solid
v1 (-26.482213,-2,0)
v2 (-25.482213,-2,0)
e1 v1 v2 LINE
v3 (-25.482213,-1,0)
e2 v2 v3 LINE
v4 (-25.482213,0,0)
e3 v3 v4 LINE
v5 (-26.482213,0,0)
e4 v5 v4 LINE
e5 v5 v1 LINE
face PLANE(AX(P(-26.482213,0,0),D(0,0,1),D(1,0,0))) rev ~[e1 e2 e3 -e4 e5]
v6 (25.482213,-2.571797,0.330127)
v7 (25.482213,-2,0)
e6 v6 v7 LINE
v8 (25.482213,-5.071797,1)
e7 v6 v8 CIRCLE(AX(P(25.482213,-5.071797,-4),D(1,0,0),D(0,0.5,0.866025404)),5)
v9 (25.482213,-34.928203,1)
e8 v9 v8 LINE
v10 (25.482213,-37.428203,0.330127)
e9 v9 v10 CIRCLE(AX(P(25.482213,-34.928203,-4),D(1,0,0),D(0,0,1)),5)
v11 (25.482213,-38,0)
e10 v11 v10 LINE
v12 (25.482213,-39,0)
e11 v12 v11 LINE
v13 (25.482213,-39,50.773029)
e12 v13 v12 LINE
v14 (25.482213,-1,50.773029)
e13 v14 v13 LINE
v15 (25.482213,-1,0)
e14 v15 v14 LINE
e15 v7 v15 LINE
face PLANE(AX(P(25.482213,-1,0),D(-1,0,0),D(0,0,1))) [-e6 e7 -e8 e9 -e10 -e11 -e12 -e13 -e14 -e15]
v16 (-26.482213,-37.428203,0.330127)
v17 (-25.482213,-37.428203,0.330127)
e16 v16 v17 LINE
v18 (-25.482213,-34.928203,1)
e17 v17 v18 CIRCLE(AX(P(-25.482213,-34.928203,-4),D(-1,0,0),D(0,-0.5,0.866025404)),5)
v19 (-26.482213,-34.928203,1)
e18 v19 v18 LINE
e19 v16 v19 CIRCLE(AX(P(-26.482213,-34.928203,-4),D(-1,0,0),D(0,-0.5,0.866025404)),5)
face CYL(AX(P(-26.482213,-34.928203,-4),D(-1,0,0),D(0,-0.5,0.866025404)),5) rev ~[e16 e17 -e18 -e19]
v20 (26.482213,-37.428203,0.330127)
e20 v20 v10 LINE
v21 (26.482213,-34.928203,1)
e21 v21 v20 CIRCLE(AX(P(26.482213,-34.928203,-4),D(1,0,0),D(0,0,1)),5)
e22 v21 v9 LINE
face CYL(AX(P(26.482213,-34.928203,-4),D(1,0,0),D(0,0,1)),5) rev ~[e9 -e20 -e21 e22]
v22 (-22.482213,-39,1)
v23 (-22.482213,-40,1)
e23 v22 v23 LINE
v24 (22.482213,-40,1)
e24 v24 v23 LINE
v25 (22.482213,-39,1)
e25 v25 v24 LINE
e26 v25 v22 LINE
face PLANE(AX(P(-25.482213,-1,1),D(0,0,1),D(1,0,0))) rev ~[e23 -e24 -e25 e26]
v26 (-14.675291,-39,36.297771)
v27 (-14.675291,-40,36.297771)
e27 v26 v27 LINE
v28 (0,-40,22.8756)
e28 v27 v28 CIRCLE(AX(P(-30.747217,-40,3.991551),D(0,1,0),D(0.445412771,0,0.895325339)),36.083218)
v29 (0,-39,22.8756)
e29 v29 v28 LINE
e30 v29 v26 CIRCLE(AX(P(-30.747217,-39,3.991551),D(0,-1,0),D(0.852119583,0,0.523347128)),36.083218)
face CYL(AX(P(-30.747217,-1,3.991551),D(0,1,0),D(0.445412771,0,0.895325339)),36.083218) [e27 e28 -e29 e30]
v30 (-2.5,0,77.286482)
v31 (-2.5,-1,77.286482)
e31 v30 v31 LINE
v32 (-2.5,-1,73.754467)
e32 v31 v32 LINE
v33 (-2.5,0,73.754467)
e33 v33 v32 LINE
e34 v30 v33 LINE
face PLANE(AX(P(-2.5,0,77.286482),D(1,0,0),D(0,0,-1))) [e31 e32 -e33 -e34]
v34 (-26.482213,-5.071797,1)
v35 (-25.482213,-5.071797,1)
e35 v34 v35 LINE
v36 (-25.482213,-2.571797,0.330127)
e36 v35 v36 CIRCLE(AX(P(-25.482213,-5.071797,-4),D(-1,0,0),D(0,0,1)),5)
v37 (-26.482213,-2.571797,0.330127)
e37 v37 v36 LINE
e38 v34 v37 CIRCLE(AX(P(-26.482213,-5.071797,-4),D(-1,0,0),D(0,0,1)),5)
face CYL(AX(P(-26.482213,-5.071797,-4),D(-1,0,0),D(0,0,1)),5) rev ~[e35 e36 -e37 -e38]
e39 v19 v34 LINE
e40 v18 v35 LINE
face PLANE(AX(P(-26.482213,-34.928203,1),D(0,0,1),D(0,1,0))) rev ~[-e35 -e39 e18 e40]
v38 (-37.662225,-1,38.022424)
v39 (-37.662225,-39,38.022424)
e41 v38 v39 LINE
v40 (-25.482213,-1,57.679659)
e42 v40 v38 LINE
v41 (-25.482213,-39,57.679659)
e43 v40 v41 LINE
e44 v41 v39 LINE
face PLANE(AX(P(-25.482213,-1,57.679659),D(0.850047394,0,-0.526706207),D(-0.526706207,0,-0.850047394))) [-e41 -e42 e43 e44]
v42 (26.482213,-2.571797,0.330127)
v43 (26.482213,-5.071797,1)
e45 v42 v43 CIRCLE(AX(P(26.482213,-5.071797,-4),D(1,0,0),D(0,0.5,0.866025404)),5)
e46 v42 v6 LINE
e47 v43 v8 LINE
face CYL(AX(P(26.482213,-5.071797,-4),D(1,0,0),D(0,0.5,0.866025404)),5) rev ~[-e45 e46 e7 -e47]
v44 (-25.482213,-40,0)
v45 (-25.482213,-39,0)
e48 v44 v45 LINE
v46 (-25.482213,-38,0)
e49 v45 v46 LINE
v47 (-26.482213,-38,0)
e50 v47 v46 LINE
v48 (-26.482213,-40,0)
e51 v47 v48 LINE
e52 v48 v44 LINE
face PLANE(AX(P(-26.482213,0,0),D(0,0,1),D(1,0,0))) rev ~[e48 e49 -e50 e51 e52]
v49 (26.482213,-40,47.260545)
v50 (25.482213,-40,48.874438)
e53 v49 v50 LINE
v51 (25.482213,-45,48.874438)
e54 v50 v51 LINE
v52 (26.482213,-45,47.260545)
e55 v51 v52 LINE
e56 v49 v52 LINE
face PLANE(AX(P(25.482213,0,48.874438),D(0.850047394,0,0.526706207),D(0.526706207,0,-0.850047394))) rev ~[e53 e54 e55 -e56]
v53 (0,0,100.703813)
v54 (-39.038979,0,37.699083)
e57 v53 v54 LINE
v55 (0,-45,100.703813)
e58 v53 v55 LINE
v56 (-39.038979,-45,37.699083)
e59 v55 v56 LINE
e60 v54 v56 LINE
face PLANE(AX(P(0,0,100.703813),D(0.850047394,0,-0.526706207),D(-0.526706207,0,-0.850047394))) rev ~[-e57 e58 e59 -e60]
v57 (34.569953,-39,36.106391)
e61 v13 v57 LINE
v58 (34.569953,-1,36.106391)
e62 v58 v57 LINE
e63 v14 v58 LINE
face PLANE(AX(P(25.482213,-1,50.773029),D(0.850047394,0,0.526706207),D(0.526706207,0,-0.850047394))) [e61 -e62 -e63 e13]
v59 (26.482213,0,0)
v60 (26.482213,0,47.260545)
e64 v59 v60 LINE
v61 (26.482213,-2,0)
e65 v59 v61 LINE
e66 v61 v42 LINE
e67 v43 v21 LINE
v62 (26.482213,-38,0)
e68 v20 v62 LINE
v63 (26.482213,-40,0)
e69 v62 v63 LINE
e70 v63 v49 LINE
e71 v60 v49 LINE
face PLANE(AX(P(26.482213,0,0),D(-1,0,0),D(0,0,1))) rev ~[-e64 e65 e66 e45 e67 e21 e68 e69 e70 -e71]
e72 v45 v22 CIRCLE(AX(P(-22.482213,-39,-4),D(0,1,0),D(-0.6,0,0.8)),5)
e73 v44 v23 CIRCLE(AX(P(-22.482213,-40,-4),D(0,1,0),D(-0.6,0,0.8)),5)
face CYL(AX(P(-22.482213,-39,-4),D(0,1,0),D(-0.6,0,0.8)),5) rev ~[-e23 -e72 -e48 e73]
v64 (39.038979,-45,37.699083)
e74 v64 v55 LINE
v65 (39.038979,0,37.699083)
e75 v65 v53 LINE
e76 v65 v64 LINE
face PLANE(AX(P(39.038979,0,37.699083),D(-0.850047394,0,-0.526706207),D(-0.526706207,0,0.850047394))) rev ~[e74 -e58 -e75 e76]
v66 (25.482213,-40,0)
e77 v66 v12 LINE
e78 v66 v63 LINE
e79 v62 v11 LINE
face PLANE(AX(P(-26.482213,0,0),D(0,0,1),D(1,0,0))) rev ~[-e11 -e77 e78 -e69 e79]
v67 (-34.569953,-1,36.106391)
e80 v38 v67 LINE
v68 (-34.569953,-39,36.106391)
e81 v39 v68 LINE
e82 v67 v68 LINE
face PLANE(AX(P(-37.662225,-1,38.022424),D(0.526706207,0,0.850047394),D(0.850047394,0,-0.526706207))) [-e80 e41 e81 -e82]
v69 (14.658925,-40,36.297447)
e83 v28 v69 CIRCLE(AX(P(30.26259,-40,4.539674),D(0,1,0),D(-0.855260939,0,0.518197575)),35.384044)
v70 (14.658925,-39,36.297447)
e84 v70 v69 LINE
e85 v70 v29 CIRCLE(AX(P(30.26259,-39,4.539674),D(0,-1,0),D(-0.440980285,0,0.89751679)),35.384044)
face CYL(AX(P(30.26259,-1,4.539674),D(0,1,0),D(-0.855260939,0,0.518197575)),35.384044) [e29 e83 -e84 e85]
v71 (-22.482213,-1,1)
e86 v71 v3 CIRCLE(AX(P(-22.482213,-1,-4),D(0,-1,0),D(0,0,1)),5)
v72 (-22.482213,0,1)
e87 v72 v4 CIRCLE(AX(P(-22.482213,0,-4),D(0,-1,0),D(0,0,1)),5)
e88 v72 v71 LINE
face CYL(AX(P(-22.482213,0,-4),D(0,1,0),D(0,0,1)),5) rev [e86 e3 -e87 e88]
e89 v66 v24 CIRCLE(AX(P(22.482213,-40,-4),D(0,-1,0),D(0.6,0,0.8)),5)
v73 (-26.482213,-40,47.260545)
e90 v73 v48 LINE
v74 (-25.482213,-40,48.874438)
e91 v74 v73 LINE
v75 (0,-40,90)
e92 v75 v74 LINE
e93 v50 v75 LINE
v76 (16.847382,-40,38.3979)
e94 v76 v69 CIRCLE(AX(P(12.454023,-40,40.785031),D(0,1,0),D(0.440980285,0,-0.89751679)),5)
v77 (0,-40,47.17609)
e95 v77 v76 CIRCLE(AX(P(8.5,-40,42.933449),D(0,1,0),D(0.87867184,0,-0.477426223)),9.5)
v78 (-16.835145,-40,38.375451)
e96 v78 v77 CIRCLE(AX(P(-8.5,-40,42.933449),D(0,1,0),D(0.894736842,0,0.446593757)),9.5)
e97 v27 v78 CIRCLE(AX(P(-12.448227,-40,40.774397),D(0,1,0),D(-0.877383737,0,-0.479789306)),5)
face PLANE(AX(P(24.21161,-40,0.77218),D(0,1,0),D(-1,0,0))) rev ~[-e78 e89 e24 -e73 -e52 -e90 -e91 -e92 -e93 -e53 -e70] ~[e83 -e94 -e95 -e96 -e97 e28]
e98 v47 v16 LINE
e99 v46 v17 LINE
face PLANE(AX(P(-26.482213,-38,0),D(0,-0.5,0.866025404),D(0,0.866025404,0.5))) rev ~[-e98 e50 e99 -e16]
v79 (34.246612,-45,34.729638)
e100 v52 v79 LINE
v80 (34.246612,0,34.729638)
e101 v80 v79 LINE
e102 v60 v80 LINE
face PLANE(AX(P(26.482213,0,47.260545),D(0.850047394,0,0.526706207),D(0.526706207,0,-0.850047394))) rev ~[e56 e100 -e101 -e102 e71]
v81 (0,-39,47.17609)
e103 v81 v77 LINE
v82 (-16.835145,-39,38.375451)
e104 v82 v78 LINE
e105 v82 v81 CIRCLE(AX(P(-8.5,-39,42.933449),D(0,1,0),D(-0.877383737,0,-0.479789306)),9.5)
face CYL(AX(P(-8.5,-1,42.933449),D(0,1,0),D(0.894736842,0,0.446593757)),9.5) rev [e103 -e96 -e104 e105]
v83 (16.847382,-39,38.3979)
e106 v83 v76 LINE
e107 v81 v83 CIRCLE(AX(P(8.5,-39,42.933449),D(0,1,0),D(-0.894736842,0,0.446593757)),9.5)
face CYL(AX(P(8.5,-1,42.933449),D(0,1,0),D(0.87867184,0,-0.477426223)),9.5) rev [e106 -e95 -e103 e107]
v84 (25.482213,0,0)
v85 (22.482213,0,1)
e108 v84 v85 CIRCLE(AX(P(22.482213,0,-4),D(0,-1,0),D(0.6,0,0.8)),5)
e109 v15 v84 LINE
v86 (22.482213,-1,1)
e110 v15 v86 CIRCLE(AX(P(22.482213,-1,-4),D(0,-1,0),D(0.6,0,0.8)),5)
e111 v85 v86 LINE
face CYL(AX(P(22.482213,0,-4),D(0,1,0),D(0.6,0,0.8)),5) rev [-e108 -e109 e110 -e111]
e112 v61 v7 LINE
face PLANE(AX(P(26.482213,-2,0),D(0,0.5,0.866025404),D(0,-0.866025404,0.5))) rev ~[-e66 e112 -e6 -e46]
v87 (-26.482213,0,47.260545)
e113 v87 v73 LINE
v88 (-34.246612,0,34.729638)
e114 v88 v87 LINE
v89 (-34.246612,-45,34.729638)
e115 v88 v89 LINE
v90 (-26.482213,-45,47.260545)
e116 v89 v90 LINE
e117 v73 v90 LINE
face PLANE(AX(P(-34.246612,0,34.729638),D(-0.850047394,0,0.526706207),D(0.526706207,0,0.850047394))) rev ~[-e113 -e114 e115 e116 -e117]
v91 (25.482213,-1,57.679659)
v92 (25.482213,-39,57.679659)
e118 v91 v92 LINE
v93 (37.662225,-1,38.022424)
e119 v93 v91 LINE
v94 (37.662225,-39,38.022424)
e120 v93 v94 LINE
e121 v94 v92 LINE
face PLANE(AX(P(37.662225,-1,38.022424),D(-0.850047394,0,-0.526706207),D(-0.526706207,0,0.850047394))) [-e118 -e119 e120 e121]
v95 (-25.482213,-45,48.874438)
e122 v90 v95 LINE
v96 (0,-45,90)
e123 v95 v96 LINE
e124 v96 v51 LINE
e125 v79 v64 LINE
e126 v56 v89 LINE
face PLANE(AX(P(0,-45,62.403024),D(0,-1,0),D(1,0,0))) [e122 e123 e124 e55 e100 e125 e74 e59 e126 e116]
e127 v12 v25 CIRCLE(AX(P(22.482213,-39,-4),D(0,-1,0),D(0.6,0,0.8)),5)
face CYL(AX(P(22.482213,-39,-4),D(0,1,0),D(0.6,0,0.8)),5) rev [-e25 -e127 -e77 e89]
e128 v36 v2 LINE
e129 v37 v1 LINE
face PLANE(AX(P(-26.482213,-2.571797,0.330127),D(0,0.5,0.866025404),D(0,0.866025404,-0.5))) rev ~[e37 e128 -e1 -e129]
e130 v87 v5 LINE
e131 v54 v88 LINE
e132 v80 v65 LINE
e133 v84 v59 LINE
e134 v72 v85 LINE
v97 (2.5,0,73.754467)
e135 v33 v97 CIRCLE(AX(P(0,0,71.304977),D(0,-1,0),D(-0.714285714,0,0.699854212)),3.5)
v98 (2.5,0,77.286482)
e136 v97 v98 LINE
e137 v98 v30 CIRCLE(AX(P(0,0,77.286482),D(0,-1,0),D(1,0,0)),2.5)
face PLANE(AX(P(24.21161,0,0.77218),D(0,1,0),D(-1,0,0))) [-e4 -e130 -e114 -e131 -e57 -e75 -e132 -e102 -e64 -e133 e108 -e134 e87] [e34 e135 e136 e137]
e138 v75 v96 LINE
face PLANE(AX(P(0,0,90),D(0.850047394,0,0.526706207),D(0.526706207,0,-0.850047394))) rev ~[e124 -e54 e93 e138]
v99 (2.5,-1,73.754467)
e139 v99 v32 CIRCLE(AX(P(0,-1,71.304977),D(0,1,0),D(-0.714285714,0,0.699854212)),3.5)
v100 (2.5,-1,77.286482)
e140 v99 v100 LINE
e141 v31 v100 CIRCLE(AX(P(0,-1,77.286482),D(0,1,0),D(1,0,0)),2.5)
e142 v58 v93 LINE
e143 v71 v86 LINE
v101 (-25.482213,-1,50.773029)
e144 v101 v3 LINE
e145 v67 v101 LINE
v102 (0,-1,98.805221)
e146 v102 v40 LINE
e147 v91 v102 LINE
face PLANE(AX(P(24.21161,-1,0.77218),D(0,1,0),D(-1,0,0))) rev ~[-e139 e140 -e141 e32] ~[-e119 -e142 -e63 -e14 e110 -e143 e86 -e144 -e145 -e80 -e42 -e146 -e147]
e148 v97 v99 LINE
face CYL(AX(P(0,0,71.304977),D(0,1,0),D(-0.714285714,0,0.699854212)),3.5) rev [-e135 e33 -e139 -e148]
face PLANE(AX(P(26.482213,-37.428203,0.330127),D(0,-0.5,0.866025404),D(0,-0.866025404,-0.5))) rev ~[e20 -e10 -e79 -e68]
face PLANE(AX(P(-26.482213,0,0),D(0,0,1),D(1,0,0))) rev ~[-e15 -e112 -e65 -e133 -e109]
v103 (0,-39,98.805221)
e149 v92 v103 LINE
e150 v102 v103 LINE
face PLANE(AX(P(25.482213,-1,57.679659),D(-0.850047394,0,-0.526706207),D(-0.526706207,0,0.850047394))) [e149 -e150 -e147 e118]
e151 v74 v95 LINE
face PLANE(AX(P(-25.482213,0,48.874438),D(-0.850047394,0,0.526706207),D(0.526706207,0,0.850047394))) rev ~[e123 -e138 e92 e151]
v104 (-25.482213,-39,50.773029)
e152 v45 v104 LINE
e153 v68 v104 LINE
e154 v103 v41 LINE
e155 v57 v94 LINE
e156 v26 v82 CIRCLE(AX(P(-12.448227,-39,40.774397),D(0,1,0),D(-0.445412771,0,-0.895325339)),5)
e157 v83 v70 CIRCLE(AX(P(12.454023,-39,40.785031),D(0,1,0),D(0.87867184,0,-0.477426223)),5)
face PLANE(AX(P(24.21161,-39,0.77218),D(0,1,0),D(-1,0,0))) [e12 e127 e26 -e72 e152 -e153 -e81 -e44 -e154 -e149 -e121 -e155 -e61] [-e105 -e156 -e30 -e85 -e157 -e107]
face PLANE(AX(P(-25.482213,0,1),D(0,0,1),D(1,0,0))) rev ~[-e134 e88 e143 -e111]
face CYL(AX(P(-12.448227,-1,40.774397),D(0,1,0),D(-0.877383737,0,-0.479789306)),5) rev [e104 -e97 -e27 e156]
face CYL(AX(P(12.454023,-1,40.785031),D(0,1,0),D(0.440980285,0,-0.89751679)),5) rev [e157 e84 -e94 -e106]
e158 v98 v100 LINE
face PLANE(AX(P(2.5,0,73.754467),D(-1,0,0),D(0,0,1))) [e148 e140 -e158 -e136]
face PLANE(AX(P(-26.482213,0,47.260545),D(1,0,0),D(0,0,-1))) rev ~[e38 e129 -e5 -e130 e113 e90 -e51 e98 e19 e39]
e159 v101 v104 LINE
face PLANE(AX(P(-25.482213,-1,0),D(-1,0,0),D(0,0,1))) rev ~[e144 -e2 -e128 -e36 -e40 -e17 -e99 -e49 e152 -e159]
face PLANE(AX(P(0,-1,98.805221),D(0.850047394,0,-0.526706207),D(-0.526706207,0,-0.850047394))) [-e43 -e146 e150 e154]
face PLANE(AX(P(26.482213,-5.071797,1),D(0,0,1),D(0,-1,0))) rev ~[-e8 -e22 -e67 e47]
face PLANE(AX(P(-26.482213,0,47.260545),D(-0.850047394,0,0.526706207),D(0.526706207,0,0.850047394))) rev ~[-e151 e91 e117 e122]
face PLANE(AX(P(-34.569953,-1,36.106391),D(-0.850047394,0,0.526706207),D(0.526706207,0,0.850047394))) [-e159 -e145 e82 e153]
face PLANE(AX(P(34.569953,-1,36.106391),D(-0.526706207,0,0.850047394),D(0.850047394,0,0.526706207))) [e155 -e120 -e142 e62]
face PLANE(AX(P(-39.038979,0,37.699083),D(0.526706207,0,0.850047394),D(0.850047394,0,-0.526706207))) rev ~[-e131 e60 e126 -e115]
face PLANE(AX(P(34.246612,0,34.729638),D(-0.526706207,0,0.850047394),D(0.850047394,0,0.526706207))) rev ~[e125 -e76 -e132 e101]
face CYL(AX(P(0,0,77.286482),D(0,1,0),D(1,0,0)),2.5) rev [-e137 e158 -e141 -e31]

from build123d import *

# Parameters (mm, degrees)
F0_W         = 50.964426635
F0_H         = 1
F1_DEPTH     = 40
F2_DEPTH     = 45
F3_DEPTH     = 5
F4_START     = 1
F4_DEPTH     = 44.001
F6_START     = 1
F6_DEPTH     = 38
F7_START     = 1
F7_DEPTH     = 44.001
F9_DEPTH     = 25
F11_DEPTH    = 25
F12_T1_DEPTH = 1
F12_T3_DEPTH = 1


# Not quite as in the source:
# - a fillet or chamfer that OpenCascade refuses, or shapes differently, is made with other operations: its cross-section is extruded or revolved along the edge and cut away or added


with BuildPart() as f1:
    # F0 (on Front) → F1 (new body)
    with BuildSketch(Plane.XZ):
        Polygon((25.4822133175, 48.8744375096), (0, 90), (-25.4822133175, 48.8744375096), (-25.4822133175, 1), (25.4822133175, 1), align=None)
        with BuildLine():
            ThreePointArc((-16.8351454988, 38.3754507383), (-12.9010914993, 51.3524985976), (0, 47.1760898363))
            ThreePointArc((0, 47.1760898363), (12.8897582031, 51.3584134172), (16.847382477, 38.3979000332))
            ThreePointArc((16.847382477, 38.3979000332), (15.916282128, 37.1777103045), (14.6589247027, 36.2974471967))
            ThreePointArc((14.6589247027, 36.2974471967), (6.3677193864, 30.6369091459), (0, 22.8755995631))
            ThreePointArc((0, 22.8755995631), (-6.3946665322, 30.6177021843), (-14.6752906719, 36.297770574))
            ThreePointArc((-14.6752906719, 36.297770574), (-15.914547628, 37.1709794451), (-16.8351454988, 38.3754507383))
        make_face(mode=Mode.SUBTRACT)
        with BuildLine():
            Line((-2.5, 73.7544666829), (-2.5, 77.2864818573))
            ThreePointArc((-2.5, 77.2864818573), (0, 79.7864818573), (2.5, 77.2864818573))
            Line((2.5, 77.2864818573), (2.5, 73.7544666829))
            ThreePointArc((2.5, 73.7544666829), (0, 67.8049769402), (-2.5, 73.7544666829))
        make_face(mode=Mode.SUBTRACT)
        with BuildLine():
            ThreePointArc((16.847382477, 38.3979000332), (12.8897582031, 51.3584134172), (0, 47.1760898363))
            ThreePointArc((0, 47.1760898363), (-12.9010914993, 51.3524985976), (-16.8351454988, 38.3754507383))
            ThreePointArc((-16.8351454988, 38.3754507383), (-15.914547628, 37.1709794451), (-14.6752906719, 36.297770574))
            ThreePointArc((-14.6752906719, 36.297770574), (-6.3946665322, 30.6177021843), (0, 22.8755995631))
            ThreePointArc((0, 22.8755995631), (6.3677193864, 30.6369091459), (14.6589247027, 36.2974471967))
            ThreePointArc((14.6589247027, 36.2974471967), (15.916282128, 37.1777103045), (16.847382477, 38.3979000332))
        make_face()
        with BuildLine():
            ThreePointArc((2.5, 77.2864818573), (0, 79.7864818573), (-2.5, 77.2864818573))
            Line((-2.5, 77.2864818573), (-2.5, 73.7544666829))
            ThreePointArc((-2.5, 73.7544666829), (0, 67.8049769402), (2.5, 73.7544666829))
            Line((2.5, 73.7544666829), (2.5, 77.2864818573))
        make_face()
        with Locations((0, 0.5)):
            Rectangle(F0_W, F0_H)
        Polygon((-25.4822133175, 1), (-25.4822133175, 48.8744375096), (-26.4822133175, 47.2605446354), (-26.4822133175, 0), (-25.4822133175, 0), align=None)
        Polygon((26.4822133175, 47.2605446354), (25.4822133175, 48.8744375096), (25.4822133175, 1), (25.4822133175, 0), (26.4822133175, 0), align=None)
    extrude(amount=F1_DEPTH)

    # F0 (on Front) → F2 (join)
    with BuildSketch(Plane.XZ):
        Polygon((-26.4822133175, 47.2605446354), (-25.4822133175, 48.8744375096), (-25.4822133175, 50.7730291479), (-34.5699527606, 36.1063912187), (-37.6622251316, 38.0224244453), (-25.4822133175, 57.679658719), (0, 98.8052212095), (25.4822133175, 57.679658719), (37.6622251316, 38.0224244453), (34.5699527606, 36.1063912187), (25.4822133175, 50.7730291479), (25.4822133175, 48.8744375096), (26.4822133175, 47.2605446354), (34.2466115735, 34.7296376181), (39.0389787322, 37.6990832582), (0, 100.7038128478), (-39.0389787322, 37.6990832582), (-34.2466115735, 34.7296376181), align=None)
        Polygon((-25.4822133175, 48.8744375096), (0, 90), (25.4822133175, 48.8744375096), (25.4822133175, 50.7730291479), (25.4822133175, 57.679658719), (0, 98.8052212095), (-25.4822133175, 57.679658719), (-25.4822133175, 50.7730291479), align=None)
        Polygon((-34.5699527606, 36.1063912187), (-25.4822133175, 50.7730291479), (-25.4822133175, 57.679658719), (-37.6622251316, 38.0224244453), align=None)
        Polygon((25.4822133175, 57.679658719), (25.4822133175, 50.7730291479), (34.5699527606, 36.1063912187), (37.6622251316, 38.0224244453), align=None)
    extrude(amount=F2_DEPTH)

    # F0 (on Front) → F3 (cut)
    with BuildSketch(Plane.XZ):
        with BuildLine():
            ThreePointArc((2.5, 77.2864818573), (0, 79.7864818573), (-2.5, 77.2864818573))
            Line((-2.5, 77.2864818573), (-2.5, 73.7544666829))
            ThreePointArc((-2.5, 73.7544666829), (0, 67.8049769402), (2.5, 73.7544666829))
            Line((2.5, 73.7544666829), (2.5, 77.2864818573))
        make_face()
        with Locations((0, 0.5)):
            Rectangle(F0_W, F0_H)
    extrude(amount=F3_DEPTH, mode=Mode.SUBTRACT)

    # F0 (on Front) → F4 (cut)
    with BuildSketch(Plane.XZ.offset(F4_START)):
        with BuildLine():
            ThreePointArc((16.847382477, 38.3979000332), (12.8897582031, 51.3584134172), (0, 47.1760898363))
            ThreePointArc((0, 47.1760898363), (-12.9010914993, 51.3524985976), (-16.8351454988, 38.3754507383))
            ThreePointArc((-16.8351454988, 38.3754507383), (-15.914547628, 37.1709794451), (-14.6752906719, 36.297770574))
            ThreePointArc((-14.6752906719, 36.297770574), (-6.3946665322, 30.6177021843), (0, 22.8755995631))
            ThreePointArc((0, 22.8755995631), (6.3677193864, 30.6369091459), (14.6589247027, 36.2974471967))
            ThreePointArc((14.6589247027, 36.2974471967), (15.916282128, 37.1777103045), (16.847382477, 38.3979000332))
        make_face()
    extrude(amount=F4_DEPTH, mode=Mode.SUBTRACT)

    # F0 (on Front) → F6 (cut)
    with BuildSketch(Plane.XZ.offset(F6_START)):
        Polygon((25.4822133175, 48.8744375096), (0, 90), (-25.4822133175, 48.8744375096), (-25.4822133175, 1), (25.4822133175, 1), align=None)
        with BuildLine():
            ThreePointArc((-16.8351454988, 38.3754507383), (-12.9010914993, 51.3524985976), (0, 47.1760898363))
            ThreePointArc((0, 47.1760898363), (12.8897582031, 51.3584134172), (16.847382477, 38.3979000332))
            ThreePointArc((16.847382477, 38.3979000332), (15.916282128, 37.1777103045), (14.6589247027, 36.2974471967))
            ThreePointArc((14.6589247027, 36.2974471967), (6.3677193864, 30.6369091459), (0, 22.8755995631))
            ThreePointArc((0, 22.8755995631), (-6.3946665322, 30.6177021843), (-14.6752906719, 36.297770574))
            ThreePointArc((-14.6752906719, 36.297770574), (-15.914547628, 37.1709794451), (-16.8351454988, 38.3754507383))
        make_face(mode=Mode.SUBTRACT)
        with BuildLine():
            Line((-2.5, 73.7544666829), (-2.5, 77.2864818573))
            ThreePointArc((-2.5, 77.2864818573), (0, 79.7864818573), (2.5, 77.2864818573))
            Line((2.5, 77.2864818573), (2.5, 73.7544666829))
            ThreePointArc((2.5, 73.7544666829), (0, 67.8049769402), (-2.5, 73.7544666829))
        make_face(mode=Mode.SUBTRACT)
        Polygon((-25.4822133175, 48.8744375096), (0, 90), (25.4822133175, 48.8744375096), (25.4822133175, 50.7730291479), (25.4822133175, 57.679658719), (0, 98.8052212095), (-25.4822133175, 57.679658719), (-25.4822133175, 50.7730291479), align=None)
        with BuildLine():
            ThreePointArc((2.5, 77.2864818573), (0, 79.7864818573), (-2.5, 77.2864818573))
            Line((-2.5, 77.2864818573), (-2.5, 73.7544666829))
            ThreePointArc((-2.5, 73.7544666829), (0, 67.8049769402), (2.5, 73.7544666829))
            Line((2.5, 73.7544666829), (2.5, 77.2864818573))
        make_face()
        Polygon((-34.5699527606, 36.1063912187), (-25.4822133175, 50.7730291479), (-25.4822133175, 57.679658719), (-37.6622251316, 38.0224244453), align=None)
        Polygon((25.4822133175, 57.679658719), (25.4822133175, 50.7730291479), (34.5699527606, 36.1063912187), (37.6622251316, 38.0224244453), align=None)
        with Locations((0, 0.5)):
            Rectangle(F0_W, F0_H)
    extrude(amount=F6_DEPTH, mode=Mode.SUBTRACT)

    # F0 (on Front) → F7 (cut)
    with BuildSketch(Plane.XZ.offset(F7_START)):
        with Locations((0, 0.5)):
            Rectangle(F0_W, F0_H)
    extrude(amount=F7_DEPTH, mode=Mode.SUBTRACT)

    # F8 (on face) → F9 (cut)
    with BuildSketch(Plane(origin=(-26.4822133175, 0, 0), x_dir=(0, -1, 0), z_dir=(-1, 0, 0))):
        with BuildLine():
            Line((34.9282032303, 1), (5.0717967697, 1))
            ThreePointArc((5.0717967697, 1), (3.7777015442, 0.8296291314), (2.5717967697, 0.3301270189))
            Line((2.5717967697, 0.3301270189), (2, 0))
            Line((2, 0), (38, 0))
            Line((38, 0), (37.4282032303, 0.3301270189))
            ThreePointArc((37.4282032303, 0.3301270189), (36.2222984558, 0.8296291314), (34.9282032303, 1))
        make_face()
    extrude(amount=-F9_DEPTH, mode=Mode.SUBTRACT)

    # F10 (on face) → F11 (cut)
    with BuildSketch(Plane.YZ.offset(26.4822133175)):
        with BuildLine():
            Line((-37.4282032303, 0.3301270189), (-38, 0))
            Line((-38, 0), (-2, 0))
            Line((-2, 0), (-2.5717967697, 0.3301270189))
            ThreePointArc((-2.5717967697, 0.3301270189), (-3.7777015442, 0.8296291314), (-5.0717967697, 1))
            Line((-5.0717967697, 1), (-34.9282032303, 1))
            ThreePointArc((-34.9282032303, 1), (-36.2222984558, 0.8296291314), (-37.4282032303, 0.3301270189))
        make_face()
    extrude(amount=-F11_DEPTH, mode=Mode.SUBTRACT)

    # F12: fillet of radius 5 on 4 edges, made by hand

    # F12_s2 → F12_t1 (join)
    with BuildSketch(Plane.XZ):
        with BuildLine():
            ThreePointArc((25.4822133175, 0), (24.0633521476, 0.7434164903), (22.4822133175, 1))
            Line((22.4822133175, 1), (25.4822133175, 1))
            Line((25.4822133175, 1), (25.4822133175, 0))
        make_face()
        with BuildLine():
            ThreePointArc((-22.4822133175, 1), (-24.0633521476, 0.7434164903), (-25.4822133175, 0))
            Line((-25.4822133175, 0), (-25.4822133175, 1))
            Line((-25.4822133175, 1), (-22.4822133175, 1))
        make_face()
    extrude(amount=F12_T1_DEPTH)

    # F12_s4 → F12_t3 (join)
    with BuildSketch(Plane.XZ.offset(39)):
        with BuildLine():
            ThreePointArc((25.4822133175, 0), (24.0633521476, 0.7434164903), (22.4822133175, 1))
            Line((22.4822133175, 1), (25.4822133175, 1))
            Line((25.4822133175, 1), (25.4822133175, 0))
        make_face()
        with BuildLine():
            ThreePointArc((-25.4822133175, 0), (-24.0633521476, 0.7434164903), (-22.4822133175, 1))
            Line((-22.4822133175, 1), (-25.4822133175, 1))
            Line((-25.4822133175, 1), (-25.4822133175, 0))
        make_face()
    extrude(amount=F12_T3_DEPTH)


solid = f1.part
